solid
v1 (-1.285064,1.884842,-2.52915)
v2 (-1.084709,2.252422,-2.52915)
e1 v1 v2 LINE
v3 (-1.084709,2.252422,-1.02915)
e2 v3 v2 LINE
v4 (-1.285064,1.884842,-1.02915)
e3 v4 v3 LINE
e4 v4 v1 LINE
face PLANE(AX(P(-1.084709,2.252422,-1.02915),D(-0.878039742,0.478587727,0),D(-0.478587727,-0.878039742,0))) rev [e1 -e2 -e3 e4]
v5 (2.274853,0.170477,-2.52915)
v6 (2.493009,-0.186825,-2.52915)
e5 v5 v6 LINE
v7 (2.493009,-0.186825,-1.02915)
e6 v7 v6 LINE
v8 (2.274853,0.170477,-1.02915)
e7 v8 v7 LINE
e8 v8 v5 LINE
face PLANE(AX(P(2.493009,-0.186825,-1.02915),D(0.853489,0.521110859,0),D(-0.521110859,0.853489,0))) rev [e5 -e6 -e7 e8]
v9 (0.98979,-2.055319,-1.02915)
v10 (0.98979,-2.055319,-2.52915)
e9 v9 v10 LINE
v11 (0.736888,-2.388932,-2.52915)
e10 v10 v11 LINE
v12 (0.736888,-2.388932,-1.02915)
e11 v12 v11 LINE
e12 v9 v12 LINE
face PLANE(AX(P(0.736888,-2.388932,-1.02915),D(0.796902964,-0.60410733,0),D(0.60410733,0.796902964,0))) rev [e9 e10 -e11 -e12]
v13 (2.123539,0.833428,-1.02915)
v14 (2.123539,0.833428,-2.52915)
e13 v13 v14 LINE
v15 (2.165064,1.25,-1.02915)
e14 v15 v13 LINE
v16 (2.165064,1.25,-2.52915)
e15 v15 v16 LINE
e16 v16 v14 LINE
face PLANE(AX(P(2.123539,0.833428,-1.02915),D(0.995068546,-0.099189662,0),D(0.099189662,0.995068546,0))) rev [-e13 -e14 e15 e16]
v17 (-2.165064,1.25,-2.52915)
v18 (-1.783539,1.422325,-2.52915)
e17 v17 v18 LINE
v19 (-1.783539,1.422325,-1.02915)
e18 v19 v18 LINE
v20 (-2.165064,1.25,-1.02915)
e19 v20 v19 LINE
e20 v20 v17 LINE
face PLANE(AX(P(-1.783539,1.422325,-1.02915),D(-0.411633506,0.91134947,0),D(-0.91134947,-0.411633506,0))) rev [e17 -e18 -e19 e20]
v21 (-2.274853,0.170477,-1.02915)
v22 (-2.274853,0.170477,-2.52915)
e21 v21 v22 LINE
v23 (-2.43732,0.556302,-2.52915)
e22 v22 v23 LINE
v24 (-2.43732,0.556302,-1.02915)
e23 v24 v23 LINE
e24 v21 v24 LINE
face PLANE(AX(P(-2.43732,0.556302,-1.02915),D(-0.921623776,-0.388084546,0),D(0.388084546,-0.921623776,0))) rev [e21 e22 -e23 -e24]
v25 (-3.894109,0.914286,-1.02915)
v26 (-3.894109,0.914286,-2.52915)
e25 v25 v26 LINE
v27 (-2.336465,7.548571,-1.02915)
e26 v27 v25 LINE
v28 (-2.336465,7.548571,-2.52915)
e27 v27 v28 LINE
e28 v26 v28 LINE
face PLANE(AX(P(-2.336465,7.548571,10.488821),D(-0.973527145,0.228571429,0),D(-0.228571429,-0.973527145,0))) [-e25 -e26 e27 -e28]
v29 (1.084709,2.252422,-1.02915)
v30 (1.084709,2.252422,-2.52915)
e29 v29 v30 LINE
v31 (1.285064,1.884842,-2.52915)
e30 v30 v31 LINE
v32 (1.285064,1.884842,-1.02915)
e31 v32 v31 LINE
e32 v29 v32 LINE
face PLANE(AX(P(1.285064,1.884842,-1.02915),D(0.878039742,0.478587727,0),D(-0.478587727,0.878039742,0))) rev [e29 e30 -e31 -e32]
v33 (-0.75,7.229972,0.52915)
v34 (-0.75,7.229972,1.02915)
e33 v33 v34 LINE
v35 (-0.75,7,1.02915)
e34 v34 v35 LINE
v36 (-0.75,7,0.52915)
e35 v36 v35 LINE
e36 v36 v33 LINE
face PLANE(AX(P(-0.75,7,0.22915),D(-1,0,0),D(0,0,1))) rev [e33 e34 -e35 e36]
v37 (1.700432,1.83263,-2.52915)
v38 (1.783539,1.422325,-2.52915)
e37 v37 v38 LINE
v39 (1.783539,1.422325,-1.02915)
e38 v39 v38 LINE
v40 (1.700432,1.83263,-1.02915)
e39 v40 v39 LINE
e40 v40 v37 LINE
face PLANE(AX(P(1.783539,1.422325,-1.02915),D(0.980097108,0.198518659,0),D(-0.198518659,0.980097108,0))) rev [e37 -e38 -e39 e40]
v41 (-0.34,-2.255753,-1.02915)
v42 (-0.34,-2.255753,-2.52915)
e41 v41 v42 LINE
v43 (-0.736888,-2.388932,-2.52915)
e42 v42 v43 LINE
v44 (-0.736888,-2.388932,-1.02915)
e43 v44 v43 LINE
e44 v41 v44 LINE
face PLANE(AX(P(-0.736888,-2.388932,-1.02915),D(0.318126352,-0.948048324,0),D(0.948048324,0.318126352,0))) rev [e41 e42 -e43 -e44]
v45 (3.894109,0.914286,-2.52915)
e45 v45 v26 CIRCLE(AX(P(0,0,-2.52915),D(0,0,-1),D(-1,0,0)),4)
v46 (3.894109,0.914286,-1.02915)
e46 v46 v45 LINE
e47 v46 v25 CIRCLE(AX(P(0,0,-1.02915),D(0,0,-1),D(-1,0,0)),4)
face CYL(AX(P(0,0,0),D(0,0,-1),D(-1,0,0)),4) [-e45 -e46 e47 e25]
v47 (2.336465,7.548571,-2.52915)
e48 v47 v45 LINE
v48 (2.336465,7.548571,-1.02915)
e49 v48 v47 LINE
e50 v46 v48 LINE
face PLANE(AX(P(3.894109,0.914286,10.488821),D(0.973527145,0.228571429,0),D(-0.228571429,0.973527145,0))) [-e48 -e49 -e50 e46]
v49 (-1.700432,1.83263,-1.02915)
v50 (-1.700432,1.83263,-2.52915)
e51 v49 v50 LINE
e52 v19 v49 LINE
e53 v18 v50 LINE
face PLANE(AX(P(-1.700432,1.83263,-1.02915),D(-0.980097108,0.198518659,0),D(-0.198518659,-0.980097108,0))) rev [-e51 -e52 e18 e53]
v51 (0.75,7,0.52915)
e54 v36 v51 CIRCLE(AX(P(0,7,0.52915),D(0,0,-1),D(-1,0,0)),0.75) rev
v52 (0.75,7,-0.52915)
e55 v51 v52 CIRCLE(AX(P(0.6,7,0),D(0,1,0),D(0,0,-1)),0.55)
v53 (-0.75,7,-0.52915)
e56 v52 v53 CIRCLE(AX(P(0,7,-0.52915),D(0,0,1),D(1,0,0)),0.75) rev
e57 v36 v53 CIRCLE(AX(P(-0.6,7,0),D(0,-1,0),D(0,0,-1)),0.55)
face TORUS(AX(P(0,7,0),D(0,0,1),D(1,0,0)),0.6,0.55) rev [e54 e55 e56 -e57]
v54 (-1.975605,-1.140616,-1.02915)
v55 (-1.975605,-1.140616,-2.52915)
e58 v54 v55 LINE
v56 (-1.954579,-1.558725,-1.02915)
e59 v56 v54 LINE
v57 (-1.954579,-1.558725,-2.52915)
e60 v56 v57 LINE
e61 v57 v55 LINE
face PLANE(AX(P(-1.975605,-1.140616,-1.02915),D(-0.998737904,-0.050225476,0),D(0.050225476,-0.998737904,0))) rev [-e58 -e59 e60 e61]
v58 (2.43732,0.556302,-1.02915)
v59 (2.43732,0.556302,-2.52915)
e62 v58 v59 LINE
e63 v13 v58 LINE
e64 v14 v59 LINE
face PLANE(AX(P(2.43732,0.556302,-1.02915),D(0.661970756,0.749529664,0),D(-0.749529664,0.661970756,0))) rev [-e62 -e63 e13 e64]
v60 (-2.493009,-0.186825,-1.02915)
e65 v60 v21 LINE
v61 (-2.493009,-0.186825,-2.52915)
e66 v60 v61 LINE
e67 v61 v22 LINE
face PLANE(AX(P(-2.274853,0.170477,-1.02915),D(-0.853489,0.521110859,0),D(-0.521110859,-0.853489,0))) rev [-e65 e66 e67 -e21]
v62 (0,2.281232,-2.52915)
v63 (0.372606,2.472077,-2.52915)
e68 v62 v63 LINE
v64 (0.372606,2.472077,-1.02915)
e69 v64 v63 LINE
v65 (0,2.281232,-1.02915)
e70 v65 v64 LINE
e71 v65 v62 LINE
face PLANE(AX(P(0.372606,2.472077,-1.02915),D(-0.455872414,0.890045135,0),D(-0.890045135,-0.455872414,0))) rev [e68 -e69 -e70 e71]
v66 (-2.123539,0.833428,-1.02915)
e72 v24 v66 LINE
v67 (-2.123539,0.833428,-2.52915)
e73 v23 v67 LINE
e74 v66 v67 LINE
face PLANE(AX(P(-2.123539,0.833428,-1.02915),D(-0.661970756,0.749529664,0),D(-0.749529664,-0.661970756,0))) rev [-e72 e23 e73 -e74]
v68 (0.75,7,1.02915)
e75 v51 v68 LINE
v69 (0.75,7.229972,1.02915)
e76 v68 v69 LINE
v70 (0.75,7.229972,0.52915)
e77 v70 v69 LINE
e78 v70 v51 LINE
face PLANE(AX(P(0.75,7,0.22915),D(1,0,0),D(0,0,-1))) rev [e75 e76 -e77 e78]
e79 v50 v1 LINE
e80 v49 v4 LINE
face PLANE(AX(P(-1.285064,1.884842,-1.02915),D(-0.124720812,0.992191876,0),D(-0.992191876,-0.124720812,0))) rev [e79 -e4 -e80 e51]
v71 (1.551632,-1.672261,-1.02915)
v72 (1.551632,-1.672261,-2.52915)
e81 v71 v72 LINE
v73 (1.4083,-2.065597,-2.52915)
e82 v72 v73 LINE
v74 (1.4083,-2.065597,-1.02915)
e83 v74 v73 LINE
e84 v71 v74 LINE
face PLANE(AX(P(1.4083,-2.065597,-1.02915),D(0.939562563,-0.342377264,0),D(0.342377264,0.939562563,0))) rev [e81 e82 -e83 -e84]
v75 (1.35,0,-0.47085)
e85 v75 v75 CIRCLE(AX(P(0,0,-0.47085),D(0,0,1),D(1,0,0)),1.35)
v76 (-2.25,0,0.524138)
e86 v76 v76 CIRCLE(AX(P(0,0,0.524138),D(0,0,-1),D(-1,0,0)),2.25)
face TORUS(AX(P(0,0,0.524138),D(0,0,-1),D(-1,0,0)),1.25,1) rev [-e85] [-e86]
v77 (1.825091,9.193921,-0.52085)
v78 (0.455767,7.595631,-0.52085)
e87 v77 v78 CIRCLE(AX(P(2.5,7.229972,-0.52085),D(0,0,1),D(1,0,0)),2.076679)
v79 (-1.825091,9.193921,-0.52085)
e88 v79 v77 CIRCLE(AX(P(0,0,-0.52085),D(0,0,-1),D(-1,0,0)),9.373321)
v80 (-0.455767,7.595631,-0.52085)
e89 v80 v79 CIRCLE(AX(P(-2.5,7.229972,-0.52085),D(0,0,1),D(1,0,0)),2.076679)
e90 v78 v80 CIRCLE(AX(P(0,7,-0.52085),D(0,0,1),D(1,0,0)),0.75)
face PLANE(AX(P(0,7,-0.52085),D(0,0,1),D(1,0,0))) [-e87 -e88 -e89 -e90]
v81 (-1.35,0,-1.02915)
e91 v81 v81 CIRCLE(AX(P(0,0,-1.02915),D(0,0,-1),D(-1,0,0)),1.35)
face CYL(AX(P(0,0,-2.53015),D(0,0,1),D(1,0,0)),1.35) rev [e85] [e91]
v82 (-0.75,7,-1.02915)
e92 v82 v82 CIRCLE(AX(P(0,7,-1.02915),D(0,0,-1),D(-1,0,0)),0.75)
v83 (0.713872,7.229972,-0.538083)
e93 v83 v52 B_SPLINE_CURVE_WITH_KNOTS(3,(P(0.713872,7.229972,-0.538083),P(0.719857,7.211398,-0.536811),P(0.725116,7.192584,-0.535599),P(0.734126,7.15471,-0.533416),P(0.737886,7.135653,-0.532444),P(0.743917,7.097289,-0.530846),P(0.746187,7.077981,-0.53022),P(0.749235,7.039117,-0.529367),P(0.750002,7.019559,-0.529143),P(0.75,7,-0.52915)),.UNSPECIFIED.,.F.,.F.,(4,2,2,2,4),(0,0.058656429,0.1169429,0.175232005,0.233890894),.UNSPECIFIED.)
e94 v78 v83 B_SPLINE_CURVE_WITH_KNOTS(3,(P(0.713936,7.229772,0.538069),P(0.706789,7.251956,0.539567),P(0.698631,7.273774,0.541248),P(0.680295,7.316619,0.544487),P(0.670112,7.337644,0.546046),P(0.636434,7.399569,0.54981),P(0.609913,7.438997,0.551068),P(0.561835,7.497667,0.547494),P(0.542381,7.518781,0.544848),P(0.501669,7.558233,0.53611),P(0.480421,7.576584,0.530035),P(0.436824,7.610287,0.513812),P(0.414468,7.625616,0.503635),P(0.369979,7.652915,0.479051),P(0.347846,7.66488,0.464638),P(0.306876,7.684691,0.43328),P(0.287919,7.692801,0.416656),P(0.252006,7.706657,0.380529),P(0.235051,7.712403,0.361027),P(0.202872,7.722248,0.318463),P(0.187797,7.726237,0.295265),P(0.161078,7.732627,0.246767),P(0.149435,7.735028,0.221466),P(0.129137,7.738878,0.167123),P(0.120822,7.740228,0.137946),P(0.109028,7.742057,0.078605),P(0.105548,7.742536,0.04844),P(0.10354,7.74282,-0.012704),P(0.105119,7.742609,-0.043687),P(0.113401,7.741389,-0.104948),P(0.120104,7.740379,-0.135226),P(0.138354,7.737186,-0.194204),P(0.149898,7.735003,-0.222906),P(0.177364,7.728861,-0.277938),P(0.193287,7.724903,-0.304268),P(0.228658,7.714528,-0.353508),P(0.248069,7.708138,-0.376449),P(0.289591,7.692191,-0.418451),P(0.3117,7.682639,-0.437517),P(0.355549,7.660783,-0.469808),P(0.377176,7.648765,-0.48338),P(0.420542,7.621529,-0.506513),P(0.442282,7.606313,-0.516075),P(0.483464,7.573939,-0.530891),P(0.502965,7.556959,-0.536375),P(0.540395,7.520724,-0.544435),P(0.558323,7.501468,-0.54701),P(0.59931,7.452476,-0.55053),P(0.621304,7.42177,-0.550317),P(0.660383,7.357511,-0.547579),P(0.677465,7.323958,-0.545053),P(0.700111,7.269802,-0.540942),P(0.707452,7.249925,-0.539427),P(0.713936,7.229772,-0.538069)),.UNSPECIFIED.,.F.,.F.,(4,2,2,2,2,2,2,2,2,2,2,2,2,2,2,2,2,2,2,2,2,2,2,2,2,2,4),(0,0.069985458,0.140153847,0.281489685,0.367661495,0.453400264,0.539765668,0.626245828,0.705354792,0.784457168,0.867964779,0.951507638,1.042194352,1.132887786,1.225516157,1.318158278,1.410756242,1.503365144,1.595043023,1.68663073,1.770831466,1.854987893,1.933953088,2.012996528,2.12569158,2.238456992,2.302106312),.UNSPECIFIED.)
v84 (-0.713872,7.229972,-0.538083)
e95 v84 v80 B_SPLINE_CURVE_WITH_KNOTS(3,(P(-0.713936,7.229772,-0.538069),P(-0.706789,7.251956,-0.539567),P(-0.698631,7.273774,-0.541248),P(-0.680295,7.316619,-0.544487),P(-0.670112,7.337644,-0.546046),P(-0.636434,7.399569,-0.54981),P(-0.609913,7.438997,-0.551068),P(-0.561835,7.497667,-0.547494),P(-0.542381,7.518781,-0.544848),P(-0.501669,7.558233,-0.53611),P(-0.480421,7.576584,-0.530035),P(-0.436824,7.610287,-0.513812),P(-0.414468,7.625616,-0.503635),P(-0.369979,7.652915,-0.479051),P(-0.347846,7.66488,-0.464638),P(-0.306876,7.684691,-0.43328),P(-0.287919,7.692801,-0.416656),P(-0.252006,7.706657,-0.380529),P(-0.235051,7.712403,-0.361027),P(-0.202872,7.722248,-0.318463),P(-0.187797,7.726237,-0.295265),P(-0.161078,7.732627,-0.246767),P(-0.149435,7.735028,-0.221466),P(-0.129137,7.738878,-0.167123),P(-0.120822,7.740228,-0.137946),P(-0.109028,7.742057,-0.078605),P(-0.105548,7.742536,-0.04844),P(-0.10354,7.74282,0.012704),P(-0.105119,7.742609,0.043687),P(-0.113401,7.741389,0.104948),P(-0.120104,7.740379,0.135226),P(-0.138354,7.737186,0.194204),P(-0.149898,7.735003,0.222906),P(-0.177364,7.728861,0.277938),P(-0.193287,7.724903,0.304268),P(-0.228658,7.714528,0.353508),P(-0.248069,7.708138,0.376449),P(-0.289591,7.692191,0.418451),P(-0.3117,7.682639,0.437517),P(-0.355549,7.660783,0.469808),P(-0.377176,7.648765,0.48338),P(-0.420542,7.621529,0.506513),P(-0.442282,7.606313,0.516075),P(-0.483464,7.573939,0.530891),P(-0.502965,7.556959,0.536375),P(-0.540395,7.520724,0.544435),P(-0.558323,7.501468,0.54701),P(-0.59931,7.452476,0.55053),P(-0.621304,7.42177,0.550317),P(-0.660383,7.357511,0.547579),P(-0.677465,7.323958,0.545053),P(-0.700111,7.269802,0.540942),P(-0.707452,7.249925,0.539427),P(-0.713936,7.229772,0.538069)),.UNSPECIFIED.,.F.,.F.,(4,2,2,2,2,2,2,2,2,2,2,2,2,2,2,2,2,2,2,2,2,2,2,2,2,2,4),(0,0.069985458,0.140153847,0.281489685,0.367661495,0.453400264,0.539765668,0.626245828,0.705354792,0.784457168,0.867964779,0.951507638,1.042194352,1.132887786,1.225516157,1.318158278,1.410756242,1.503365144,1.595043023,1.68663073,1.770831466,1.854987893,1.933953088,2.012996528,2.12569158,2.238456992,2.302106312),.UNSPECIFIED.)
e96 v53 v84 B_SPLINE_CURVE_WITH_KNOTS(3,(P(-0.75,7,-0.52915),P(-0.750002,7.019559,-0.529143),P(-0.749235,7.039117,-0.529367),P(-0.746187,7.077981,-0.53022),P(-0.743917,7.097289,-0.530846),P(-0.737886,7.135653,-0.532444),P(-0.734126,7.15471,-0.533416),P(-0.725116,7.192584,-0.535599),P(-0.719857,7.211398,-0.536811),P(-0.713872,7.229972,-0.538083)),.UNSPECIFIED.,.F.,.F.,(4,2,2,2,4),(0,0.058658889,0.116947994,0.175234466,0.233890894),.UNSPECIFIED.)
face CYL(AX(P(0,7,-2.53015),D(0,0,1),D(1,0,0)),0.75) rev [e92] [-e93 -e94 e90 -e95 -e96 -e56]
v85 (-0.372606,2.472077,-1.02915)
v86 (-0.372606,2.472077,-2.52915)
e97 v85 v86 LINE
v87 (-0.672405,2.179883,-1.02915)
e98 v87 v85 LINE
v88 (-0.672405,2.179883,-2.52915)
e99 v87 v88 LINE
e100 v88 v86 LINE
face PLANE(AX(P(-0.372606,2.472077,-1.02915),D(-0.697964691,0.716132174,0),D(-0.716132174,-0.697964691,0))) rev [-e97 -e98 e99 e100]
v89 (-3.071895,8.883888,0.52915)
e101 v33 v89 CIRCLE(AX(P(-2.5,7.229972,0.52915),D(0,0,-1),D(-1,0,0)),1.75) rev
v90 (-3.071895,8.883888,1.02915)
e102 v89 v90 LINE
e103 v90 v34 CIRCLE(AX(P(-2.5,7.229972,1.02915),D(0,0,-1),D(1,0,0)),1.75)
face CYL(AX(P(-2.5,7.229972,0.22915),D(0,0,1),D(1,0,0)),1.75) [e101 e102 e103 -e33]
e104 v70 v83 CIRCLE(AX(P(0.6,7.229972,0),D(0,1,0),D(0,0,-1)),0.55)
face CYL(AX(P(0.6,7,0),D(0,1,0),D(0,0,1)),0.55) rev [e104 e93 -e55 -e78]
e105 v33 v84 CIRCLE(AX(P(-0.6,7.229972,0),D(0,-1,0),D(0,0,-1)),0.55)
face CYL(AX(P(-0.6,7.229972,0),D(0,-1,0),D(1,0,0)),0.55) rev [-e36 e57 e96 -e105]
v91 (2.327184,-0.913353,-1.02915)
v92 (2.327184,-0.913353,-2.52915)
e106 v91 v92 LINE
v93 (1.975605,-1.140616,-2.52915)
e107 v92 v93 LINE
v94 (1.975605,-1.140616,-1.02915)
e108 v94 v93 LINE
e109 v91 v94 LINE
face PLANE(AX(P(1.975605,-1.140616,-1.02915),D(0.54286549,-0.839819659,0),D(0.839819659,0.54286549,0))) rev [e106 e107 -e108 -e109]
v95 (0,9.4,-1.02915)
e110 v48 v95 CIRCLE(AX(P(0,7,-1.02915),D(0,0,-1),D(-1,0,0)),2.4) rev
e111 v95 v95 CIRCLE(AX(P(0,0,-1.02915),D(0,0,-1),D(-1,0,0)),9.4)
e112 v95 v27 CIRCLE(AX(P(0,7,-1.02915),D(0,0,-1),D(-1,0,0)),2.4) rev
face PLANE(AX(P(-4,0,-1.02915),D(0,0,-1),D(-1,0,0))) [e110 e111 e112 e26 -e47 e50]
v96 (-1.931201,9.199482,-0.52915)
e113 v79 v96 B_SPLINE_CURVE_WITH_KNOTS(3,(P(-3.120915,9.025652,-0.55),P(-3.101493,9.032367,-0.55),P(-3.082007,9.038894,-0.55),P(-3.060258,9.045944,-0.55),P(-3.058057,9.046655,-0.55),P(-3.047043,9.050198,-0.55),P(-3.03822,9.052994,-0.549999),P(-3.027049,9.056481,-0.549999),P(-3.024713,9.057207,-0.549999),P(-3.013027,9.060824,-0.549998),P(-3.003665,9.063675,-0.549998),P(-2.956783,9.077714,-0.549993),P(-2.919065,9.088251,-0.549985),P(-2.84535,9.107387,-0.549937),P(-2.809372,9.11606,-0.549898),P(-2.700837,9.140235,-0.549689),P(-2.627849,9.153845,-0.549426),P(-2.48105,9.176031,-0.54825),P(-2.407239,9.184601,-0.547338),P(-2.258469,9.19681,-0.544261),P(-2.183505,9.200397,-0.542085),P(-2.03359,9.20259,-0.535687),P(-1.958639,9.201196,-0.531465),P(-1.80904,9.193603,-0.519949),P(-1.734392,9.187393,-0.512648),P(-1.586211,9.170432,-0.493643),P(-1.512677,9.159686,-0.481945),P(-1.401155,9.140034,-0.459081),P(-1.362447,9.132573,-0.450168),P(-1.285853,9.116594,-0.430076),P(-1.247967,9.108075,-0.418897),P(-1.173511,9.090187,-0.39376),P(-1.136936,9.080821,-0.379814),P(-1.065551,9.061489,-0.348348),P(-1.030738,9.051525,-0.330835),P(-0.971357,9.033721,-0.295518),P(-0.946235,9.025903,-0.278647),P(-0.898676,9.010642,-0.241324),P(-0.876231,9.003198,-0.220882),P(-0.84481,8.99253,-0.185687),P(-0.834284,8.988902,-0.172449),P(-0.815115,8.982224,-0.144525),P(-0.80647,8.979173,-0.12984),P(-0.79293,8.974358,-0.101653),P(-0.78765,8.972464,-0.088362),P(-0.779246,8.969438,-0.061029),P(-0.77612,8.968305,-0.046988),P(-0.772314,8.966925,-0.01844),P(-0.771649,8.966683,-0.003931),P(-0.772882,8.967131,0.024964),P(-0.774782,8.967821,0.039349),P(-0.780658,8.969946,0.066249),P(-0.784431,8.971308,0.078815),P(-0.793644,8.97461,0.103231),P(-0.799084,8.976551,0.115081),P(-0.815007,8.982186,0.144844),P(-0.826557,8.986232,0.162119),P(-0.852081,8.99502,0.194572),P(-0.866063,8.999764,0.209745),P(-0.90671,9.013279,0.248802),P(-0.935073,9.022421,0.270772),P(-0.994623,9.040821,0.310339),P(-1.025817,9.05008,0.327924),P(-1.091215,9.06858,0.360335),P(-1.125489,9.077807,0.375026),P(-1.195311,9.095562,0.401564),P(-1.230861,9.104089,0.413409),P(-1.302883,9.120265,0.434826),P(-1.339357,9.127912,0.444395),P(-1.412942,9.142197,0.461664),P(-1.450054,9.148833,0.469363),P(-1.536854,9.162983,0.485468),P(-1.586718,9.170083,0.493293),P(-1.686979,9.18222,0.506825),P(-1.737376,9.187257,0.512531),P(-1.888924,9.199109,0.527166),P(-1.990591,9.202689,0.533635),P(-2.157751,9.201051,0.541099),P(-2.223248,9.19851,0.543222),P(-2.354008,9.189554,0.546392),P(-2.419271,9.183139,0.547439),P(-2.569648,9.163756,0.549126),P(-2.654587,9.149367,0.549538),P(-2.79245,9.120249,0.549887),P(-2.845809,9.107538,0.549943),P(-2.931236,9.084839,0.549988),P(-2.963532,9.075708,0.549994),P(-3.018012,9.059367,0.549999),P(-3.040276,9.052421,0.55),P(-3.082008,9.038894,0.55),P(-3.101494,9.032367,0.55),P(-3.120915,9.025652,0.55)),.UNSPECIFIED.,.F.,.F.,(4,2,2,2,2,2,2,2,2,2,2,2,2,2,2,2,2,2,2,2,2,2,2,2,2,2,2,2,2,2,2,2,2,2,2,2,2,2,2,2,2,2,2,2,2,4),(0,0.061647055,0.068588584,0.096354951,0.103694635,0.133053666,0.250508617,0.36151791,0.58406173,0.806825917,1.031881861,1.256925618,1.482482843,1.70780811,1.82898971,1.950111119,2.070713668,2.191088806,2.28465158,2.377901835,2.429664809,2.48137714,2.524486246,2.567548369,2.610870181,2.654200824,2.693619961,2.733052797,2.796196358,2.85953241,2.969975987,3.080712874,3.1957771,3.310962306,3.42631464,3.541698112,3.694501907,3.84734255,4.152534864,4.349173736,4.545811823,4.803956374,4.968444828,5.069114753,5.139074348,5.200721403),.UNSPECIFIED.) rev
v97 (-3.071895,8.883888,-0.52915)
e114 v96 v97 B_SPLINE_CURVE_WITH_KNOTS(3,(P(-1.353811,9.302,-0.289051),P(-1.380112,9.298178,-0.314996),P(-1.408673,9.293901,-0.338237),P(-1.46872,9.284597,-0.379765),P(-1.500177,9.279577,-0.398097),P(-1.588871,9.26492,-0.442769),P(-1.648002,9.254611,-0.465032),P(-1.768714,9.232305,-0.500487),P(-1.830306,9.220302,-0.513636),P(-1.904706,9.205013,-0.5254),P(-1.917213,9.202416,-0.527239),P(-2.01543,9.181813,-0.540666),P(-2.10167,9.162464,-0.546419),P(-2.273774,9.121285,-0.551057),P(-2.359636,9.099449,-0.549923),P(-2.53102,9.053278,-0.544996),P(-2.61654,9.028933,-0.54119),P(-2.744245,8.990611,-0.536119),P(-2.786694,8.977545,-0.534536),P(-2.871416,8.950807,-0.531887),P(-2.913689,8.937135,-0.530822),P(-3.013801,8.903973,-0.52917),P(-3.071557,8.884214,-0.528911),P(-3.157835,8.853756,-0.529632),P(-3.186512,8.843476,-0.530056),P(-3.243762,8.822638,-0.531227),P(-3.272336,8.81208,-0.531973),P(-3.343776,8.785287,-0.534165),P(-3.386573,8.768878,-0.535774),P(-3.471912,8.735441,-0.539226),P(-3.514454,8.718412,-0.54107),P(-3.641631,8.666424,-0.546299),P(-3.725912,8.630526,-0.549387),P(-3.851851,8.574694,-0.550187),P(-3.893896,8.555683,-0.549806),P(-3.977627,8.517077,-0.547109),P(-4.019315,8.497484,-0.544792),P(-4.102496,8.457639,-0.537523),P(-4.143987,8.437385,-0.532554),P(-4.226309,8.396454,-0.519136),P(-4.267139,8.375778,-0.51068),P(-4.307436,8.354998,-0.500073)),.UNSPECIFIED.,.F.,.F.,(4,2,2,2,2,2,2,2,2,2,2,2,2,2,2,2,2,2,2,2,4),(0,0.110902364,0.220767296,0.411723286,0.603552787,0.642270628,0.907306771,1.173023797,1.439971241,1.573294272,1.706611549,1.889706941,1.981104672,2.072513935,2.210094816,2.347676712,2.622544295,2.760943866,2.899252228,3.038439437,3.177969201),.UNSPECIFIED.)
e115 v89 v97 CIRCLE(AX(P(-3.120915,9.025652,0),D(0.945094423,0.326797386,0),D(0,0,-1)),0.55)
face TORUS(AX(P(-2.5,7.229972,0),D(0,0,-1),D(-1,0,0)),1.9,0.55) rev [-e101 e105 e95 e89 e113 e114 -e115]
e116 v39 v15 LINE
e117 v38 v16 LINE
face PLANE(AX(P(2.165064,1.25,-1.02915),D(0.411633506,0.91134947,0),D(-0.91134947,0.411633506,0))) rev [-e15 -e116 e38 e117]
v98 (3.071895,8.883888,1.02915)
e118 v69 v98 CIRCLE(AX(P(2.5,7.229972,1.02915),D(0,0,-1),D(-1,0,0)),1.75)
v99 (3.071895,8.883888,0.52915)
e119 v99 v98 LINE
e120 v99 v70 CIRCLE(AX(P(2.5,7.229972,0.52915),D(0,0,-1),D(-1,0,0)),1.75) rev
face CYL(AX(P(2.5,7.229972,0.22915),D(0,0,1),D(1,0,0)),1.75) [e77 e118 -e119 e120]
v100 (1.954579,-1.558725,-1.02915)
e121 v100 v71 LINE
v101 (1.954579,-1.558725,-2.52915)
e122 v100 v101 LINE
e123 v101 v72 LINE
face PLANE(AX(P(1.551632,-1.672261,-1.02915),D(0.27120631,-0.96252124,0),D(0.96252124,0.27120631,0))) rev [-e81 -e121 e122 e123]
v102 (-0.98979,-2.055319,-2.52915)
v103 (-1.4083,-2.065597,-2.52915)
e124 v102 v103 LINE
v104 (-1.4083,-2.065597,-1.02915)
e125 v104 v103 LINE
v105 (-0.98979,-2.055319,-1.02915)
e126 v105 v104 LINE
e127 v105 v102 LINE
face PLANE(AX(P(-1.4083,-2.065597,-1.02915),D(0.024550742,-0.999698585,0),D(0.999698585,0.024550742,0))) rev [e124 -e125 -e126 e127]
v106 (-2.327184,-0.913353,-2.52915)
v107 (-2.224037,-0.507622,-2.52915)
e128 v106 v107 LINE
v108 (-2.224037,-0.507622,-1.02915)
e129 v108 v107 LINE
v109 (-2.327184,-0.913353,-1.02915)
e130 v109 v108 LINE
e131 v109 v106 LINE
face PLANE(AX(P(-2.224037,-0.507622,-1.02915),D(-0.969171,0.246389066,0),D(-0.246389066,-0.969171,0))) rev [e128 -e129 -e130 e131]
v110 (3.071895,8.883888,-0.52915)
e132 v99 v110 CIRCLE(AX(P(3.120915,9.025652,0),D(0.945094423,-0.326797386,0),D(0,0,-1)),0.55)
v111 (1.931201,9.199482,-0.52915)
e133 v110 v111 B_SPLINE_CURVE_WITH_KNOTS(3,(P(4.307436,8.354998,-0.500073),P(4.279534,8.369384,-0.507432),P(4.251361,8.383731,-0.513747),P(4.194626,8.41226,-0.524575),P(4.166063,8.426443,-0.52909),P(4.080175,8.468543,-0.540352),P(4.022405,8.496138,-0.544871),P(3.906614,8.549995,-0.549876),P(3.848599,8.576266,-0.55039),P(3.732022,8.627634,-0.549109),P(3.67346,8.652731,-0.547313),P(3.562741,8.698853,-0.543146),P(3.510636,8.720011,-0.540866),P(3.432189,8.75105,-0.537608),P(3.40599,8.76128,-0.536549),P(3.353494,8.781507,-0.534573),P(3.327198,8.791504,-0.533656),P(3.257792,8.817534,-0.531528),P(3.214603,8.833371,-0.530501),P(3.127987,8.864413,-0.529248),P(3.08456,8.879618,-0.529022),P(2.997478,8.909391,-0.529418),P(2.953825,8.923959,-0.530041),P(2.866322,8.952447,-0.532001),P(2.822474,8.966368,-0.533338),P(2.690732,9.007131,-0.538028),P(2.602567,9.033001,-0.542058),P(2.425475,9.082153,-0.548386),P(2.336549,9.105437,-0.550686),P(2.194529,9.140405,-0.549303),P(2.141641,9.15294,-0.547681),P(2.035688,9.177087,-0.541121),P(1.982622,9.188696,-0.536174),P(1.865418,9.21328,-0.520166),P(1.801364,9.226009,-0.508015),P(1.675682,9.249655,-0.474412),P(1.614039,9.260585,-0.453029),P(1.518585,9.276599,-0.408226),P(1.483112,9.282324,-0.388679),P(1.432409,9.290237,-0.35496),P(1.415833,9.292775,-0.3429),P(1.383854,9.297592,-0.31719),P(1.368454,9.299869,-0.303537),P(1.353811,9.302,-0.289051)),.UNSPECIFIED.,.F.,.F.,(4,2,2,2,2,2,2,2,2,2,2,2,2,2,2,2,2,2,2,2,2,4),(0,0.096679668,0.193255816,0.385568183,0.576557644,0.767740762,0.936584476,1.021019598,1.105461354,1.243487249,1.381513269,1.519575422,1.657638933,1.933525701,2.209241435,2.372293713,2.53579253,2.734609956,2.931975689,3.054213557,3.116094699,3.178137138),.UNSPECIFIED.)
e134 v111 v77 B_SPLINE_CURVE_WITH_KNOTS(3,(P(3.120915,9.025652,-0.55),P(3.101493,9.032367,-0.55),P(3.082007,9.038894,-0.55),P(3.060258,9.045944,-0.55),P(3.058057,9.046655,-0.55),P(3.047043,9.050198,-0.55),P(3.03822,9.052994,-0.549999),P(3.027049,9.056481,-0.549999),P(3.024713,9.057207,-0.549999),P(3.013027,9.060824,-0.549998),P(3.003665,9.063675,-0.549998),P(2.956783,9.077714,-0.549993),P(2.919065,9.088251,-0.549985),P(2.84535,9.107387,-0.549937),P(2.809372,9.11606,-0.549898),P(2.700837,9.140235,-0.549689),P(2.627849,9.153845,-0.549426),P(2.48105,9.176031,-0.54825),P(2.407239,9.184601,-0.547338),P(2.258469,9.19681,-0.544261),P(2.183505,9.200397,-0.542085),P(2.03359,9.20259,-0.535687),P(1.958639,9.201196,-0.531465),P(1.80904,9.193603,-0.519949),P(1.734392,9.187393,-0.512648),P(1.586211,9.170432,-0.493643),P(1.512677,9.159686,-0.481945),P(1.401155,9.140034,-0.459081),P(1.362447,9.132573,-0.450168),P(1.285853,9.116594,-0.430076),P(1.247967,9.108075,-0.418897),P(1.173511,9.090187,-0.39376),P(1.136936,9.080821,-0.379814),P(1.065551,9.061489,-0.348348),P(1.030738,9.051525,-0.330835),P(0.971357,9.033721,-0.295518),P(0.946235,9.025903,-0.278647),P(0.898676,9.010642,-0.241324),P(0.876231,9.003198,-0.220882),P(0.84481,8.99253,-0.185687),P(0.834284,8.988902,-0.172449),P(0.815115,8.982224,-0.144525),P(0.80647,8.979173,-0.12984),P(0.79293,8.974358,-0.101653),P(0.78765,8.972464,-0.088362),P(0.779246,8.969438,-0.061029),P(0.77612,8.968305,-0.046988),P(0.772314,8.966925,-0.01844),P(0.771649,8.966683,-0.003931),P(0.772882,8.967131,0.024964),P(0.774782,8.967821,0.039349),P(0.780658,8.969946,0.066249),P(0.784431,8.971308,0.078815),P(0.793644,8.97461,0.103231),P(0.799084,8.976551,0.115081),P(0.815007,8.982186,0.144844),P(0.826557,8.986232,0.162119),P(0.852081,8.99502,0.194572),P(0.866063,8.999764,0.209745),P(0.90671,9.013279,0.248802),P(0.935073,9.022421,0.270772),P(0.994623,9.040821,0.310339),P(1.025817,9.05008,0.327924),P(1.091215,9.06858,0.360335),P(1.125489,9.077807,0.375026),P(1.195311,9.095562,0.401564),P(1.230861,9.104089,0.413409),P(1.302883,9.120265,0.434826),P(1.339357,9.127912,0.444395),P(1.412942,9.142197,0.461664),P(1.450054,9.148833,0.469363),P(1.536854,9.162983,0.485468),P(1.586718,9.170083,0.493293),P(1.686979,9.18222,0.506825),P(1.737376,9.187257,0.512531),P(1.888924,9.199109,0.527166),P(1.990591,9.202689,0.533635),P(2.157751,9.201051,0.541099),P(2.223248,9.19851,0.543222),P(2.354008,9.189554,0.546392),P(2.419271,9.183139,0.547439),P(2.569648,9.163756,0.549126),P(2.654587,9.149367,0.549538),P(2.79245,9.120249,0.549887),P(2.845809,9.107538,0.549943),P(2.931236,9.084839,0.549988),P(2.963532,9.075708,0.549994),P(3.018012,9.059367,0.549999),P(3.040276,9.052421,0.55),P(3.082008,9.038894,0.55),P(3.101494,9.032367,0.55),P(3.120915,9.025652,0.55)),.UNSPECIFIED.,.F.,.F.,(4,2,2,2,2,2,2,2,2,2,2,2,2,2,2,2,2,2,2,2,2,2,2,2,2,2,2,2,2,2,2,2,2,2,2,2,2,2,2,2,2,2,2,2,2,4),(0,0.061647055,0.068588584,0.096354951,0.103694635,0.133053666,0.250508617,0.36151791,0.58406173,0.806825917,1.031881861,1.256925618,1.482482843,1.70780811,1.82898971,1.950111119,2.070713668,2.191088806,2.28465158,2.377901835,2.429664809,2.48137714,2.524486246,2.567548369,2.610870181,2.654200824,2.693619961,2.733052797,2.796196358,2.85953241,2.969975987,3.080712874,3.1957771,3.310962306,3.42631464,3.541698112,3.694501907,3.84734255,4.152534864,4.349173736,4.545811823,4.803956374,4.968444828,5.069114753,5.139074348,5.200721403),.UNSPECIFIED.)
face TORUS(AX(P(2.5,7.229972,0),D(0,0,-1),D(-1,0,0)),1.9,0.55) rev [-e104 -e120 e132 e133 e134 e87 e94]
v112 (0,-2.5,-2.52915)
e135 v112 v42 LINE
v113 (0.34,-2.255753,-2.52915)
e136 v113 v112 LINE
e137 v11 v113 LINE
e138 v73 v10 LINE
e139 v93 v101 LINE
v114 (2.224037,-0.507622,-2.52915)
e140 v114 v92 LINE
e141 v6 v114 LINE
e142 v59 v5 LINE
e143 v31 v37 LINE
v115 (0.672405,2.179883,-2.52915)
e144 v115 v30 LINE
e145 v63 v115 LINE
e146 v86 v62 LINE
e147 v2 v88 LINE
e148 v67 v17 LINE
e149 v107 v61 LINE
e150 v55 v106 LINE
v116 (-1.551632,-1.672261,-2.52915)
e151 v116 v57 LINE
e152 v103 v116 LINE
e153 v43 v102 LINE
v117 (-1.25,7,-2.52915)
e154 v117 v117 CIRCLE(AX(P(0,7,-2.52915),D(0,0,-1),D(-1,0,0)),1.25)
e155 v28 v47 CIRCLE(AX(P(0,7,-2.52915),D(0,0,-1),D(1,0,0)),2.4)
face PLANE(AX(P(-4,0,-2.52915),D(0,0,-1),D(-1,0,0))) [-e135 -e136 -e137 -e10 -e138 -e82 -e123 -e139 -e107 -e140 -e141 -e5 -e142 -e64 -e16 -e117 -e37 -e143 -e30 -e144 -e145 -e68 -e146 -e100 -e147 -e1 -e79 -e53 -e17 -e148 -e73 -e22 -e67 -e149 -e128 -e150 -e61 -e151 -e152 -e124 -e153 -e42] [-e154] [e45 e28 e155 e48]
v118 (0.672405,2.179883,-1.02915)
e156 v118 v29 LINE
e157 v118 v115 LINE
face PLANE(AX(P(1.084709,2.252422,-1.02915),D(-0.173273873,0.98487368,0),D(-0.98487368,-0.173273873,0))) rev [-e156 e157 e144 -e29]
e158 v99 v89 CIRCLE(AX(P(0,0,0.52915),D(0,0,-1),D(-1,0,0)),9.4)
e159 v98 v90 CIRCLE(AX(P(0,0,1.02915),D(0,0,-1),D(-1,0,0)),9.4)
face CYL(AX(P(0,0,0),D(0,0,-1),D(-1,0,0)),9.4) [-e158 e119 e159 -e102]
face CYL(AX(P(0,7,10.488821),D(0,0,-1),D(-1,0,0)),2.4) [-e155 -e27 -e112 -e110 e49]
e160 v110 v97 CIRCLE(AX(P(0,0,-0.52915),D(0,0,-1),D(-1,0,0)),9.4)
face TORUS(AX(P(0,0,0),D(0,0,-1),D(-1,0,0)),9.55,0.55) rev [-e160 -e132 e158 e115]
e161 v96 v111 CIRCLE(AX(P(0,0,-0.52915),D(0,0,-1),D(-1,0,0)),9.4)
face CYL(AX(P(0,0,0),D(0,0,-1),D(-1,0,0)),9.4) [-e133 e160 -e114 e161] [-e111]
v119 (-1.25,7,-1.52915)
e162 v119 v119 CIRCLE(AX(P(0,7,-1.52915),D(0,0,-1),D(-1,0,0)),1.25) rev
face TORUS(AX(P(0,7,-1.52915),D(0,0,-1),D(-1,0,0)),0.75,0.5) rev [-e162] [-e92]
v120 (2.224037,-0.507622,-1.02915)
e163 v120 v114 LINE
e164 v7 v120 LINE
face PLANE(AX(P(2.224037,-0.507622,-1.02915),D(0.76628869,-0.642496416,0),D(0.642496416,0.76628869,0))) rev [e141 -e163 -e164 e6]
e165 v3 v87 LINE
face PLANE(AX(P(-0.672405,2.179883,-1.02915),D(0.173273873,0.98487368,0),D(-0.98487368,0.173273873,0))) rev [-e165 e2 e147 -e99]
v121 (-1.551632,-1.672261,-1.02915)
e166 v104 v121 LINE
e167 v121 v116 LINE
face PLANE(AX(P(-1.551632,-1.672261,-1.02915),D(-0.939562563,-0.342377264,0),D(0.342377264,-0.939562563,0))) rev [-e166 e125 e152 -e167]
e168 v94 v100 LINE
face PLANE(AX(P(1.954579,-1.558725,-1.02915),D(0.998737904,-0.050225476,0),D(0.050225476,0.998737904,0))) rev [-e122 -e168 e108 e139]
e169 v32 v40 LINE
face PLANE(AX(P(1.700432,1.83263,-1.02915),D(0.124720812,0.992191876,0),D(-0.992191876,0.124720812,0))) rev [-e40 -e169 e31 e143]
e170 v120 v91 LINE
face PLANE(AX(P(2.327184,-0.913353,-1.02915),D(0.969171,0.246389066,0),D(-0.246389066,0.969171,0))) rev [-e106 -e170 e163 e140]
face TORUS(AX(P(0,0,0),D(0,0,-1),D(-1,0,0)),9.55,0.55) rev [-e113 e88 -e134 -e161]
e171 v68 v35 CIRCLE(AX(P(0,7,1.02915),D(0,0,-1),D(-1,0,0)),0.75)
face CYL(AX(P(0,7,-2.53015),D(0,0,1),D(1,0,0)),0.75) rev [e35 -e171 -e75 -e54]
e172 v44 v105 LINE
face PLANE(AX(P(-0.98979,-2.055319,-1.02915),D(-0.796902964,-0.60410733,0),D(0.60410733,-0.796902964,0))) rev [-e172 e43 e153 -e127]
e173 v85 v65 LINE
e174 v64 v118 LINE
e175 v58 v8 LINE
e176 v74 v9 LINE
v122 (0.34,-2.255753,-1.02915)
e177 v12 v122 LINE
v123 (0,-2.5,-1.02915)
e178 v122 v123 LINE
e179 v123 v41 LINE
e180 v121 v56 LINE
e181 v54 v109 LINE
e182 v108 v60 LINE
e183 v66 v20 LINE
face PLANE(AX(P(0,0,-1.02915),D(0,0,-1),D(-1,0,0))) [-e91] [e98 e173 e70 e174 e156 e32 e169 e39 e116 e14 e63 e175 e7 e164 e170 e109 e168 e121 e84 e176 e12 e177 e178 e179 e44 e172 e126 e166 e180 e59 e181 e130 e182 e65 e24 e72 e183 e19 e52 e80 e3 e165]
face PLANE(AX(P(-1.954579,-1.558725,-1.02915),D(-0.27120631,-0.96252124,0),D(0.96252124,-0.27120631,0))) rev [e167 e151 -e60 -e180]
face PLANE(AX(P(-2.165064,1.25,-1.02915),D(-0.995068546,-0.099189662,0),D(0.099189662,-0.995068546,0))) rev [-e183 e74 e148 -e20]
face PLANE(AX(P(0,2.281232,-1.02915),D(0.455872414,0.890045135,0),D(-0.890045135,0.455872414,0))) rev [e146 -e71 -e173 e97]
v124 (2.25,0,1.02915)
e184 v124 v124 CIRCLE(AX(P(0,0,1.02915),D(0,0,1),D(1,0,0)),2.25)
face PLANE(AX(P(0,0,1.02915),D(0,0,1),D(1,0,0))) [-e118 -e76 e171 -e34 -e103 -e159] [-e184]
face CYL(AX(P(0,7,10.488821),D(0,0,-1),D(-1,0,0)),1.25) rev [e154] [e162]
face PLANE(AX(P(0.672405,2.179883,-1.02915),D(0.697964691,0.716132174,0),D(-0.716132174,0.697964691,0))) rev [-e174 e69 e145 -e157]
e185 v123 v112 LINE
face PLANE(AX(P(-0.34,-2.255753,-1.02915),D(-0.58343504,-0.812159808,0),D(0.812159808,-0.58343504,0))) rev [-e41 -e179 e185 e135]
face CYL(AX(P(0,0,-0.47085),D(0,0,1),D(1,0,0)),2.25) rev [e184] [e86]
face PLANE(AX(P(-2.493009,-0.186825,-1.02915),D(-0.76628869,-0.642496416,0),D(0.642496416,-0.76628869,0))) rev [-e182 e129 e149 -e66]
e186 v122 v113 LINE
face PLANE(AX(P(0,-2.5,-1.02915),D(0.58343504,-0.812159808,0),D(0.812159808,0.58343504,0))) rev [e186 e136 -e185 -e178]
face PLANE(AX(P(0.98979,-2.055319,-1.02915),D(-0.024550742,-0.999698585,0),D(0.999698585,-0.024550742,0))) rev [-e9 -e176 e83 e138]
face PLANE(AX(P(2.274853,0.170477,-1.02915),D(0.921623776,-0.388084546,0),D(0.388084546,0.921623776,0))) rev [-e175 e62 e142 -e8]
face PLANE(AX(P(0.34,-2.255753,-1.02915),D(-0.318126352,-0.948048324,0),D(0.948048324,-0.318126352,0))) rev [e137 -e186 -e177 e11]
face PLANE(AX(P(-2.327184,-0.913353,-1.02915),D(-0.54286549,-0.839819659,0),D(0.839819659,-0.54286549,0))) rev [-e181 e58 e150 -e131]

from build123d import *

# Parameters (mm, degrees)
CUT_EXTRUDE1_REACH  = 15.762
SKETCH2_R           = 1.35
SKETCH2_R_2         = 0.75
CUT_EXTRUDE2_DEPTH  = 0.8
SKETCH5_R           = 2.25
CUT_EXTRUDE4_DEPTH  = 1.5
FILLET2_R           = 1
MOVE_START          = -0.520849738
MOVE_FACE1_DEPTH    = 0.75
SKETCH7_R           = 0.55
BOSS_EXTRUDE1_START = -1.5
SKETCH8_R           = 1.25
BOSS_EXTRUDE1_DEPTH = 1.5
CUT_EXTRUDE5_DEPTH  = 1.5
CIRPATTERN1_COUNT   = 21
FILLET3_R           = 0.5


# Read off the part's stored shape, not the designer's step: Move Face1
# Some blends are built 0.0001 mm under size
with BuildPart() as part:
    # Sketch1 → Revolve1 (revolve)
    with BuildSketch(Plane(origin=(0, 0, 0), x_dir=(1, 0, 0), z_dir=(0, 1, 0))):
        with BuildLine():
            Line((-4, 1.029150262), (-9.4, 1.029150262))
            Line((-9.4, 1.029150262), (-9.4, 0.529150262))
            ThreePointArc((-9.4, 0.529150262), (-9, 0), (-9.4, -0.529150262))
            Line((-9.4, -0.529150262), (-9.4, -1.029150262))
            Line((-9.4, -1.029150262), (0, -1.029150262))
            Line((0, -1.029150262), (0, 2.529150262))
            Line((0, 2.529150262), (-4, 2.529150262))
            Line((-4, 2.529150262), (-4, 1.029150262))
        make_face()
    revolve(axis=Axis((0, 0, 0), (0, 0, 1)))

    # Sketch2 → Cut-Extrude1 (cut, up to next)
    with BuildSketch(Plane(origin=(0, 0, 1.029150262), x_dir=(-1, 0, 0), z_dir=(0, 0, -1)), mode=Mode.PRIVATE) as cut_extrude1_sk1:
        Circle(SKETCH2_R)
    cut_extrude1_tool1 = extrude(cut_extrude1_sk1.sketch, amount=CUT_EXTRUDE1_REACH, mode=Mode.PRIVATE) & part.part
    # Sketch2 → Cut-Extrude1 (cut, up to next)
    with BuildSketch(Plane(origin=(0, 0, 1.029150262), x_dir=(-1, 0, 0), z_dir=(0, 0, -1)), mode=Mode.PRIVATE) as cut_extrude1_sk2:
        with Locations((0, 7)):
            Circle(SKETCH2_R_2)
    cut_extrude1_tool2 = extrude(cut_extrude1_sk2.sketch, amount=CUT_EXTRUDE1_REACH, mode=Mode.PRIVATE) & part.part
    add(cut_extrude1_tool1.solids().sort_by_distance((0, 0, 1.02915))[0], mode=Mode.SUBTRACT)
    add(cut_extrude1_tool2.solids().sort_by_distance((0, 7, 1.02915))[0], mode=Mode.SUBTRACT)

    # Sketch3 → Cut-Extrude2 (cut)
    with BuildSketch(Plane.XY.offset(1.029150262)):
        with BuildLine():
            Line((0.75, 7), (0.75, 7.229972337))
            ThreePointArc((0.75, 7.229972337), (1.484696349, 8.655334922), (3.071895425, 8.883887578))
            ThreePointArc((3.071895425, 8.883887578), (0, 9.4), (-3.071895425, 8.883887578))
            ThreePointArc((-3.071895425, 8.883887578), (-1.484696349, 8.655334922), (-0.75, 7.229972337))
            Line((-0.75, 7.229972337), (-0.75, 7))
            ThreePointArc((-0.75, 7), (0, 6.25), (0.75, 7))
        make_face()
    extrude(amount=-CUT_EXTRUDE2_DEPTH, mode=Mode.SUBTRACT)

    # Sketch5 → Cut-Extrude4 (cut)
    with BuildSketch(Plane.XY.offset(1.029150262)):
        Circle(SKETCH5_R)
    extrude(amount=-CUT_EXTRUDE4_DEPTH, mode=Mode.SUBTRACT)

    # Fillet2
    # the kernel refuses this fillet: 1 mm, written as the material it adds along each edge
    with BuildSketch(Plane(origin=(0, 0, -0.470849738), x_dir=(1, 0, 0), z_dir=(0, -1, 0))) as fillet2_piece_1:
        with BuildLine():
            CenterArc((1.25, 0.994987437), FILLET2_R, 275.739170477, 84.260829523)
            Line((1.35, 0), (1.352, -0.019899749))
            ThreePointArc((1.352, -0.019899749), (1.8, -0.02), (2.25, -0.02))
            Line((2.25, -0.02), (2.27, 0))
            Line((2.27, 0), (2.27, 0.994987437))
            Line((2.27, 0.994987437), (2.25, 0.994987437))
        make_face()
    revolve(axis=Axis((0, 0, -0.470849738), (0, 0, 1)))

    # Move Face1 outline → Move Face1 (cut)
    with BuildSketch(Plane.XY.offset(MOVE_START)):
        with BuildLine():
            ThreePointArc((-3.071895425, 8.883887578), (-1.484696349, 8.655334922), (-0.75, 7.229972337))
            Line((-0.75, 7.229972337), (-0.75, 7))
            ThreePointArc((-0.75, 7), (0, 7.75), (0.75, 7))
            Line((0.75, 7), (0.75, 7.229972337))
            ThreePointArc((0.75, 7.229972337), (1.484696349, 8.655334922), (3.071895425, 8.883887578))
            Line((3.071895425, 8.883887578), (4, 8.562964989))
            Line((4, 8.562964989), (4, 11))
            Line((4, 11), (-4, 11))
            Line((-4, 11), (-4, 8.562964989))
            Line((-4, 8.562964989), (-3.071895425, 8.883887578))
        make_face()
    extrude(amount=MOVE_FACE1_DEPTH, mode=Mode.SUBTRACT)

    # Cut-Sweep2: sweep along a path in Sketch6
    with BuildLine(Plane.XY) as cut_sweep2_path:
        ThreePointArc((3.071895425, 8.883887578), (1.484696349, 8.655334922), (0.75, 7.229972337))
        Line((0.75, 7.229972337), (0.75, 7))
        ThreePointArc((0.75, 7), (0, 6.25), (-0.75, 7))
        Line((-0.75, 7), (-0.75, 7.229972337))
        ThreePointArc((-0.75, 7.229972337), (-1.484696349, 8.655334922), (-3.071895425, 8.883887578))
    # Sketch7 → Cut-Sweep2 (sweep, cut)
    with BuildSketch(Plane(origin=(0, 0, 0), x_dir=(0, 0, -1), z_dir=(1, 0, 0))):
        with Locations((0, 6.4)):
            Circle(SKETCH7_R)
    sweep(path=cut_sweep2_path.line, mode=Mode.SUBTRACT)

    # Sketch8 → Boss-Extrude1 (add)
    with BuildSketch(Plane(origin=(0, 0, -2.529150262), x_dir=(-1, 0, 0), z_dir=(0, 0, -1)).offset(BOSS_EXTRUDE1_START)):
        with BuildLine():
            Line((-3.89410858, 0.914285714), (-2.336465148, 7.548571429))
            ThreePointArc((-2.336465148, 7.548571429), (0, 9.4), (2.336465148, 7.548571429))
            Line((2.336465148, 7.548571429), (3.89410858, 0.914285714))
            ThreePointArc((3.89410858, 0.914285714), (0, 4), (-3.89410858, 0.914285714))
        make_face()
        with Locations((0, 7)):
            Circle(SKETCH8_R, mode=Mode.SUBTRACT)
    extrude(amount=BOSS_EXTRUDE1_DEPTH)

    # Sketch9 → Cut-Extrude5 (cut)
    with BuildSketch(Plane(origin=(0, 0, -2.529150262), x_dir=(-1, 0, 0), z_dir=(0, 0, -1))):
        Polygon((0, 0), (0, 2.281232088), (0.372605665, 2.472077066), (0.672404962, 2.179883347), align=None)
    cut_extrude5 = extrude(amount=-CUT_EXTRUDE5_DEPTH, mode=Mode.SUBTRACT)

    # CirPattern1: Cut-Extrude5 ×21 about axis
    cirpattern1_axis = Axis((0, 0, 0), (0, 0, 1))
    for i in range(1, CIRPATTERN1_COUNT):
        add(cut_extrude5.rotate(cirpattern1_axis, i * 360 / CIRPATTERN1_COUNT), mode=Mode.SUBTRACT)

    # Fillet3
    fillet3_edges = [part.edges().sort_by_distance(p)[0] for p in [
        (1.25, 7, -1.029150262),
    ]]
    fillet(fillet3_edges, radius=FILLET3_R - 0.0001)  # a hair under: the kernel refuses the full size


solid = part.part
